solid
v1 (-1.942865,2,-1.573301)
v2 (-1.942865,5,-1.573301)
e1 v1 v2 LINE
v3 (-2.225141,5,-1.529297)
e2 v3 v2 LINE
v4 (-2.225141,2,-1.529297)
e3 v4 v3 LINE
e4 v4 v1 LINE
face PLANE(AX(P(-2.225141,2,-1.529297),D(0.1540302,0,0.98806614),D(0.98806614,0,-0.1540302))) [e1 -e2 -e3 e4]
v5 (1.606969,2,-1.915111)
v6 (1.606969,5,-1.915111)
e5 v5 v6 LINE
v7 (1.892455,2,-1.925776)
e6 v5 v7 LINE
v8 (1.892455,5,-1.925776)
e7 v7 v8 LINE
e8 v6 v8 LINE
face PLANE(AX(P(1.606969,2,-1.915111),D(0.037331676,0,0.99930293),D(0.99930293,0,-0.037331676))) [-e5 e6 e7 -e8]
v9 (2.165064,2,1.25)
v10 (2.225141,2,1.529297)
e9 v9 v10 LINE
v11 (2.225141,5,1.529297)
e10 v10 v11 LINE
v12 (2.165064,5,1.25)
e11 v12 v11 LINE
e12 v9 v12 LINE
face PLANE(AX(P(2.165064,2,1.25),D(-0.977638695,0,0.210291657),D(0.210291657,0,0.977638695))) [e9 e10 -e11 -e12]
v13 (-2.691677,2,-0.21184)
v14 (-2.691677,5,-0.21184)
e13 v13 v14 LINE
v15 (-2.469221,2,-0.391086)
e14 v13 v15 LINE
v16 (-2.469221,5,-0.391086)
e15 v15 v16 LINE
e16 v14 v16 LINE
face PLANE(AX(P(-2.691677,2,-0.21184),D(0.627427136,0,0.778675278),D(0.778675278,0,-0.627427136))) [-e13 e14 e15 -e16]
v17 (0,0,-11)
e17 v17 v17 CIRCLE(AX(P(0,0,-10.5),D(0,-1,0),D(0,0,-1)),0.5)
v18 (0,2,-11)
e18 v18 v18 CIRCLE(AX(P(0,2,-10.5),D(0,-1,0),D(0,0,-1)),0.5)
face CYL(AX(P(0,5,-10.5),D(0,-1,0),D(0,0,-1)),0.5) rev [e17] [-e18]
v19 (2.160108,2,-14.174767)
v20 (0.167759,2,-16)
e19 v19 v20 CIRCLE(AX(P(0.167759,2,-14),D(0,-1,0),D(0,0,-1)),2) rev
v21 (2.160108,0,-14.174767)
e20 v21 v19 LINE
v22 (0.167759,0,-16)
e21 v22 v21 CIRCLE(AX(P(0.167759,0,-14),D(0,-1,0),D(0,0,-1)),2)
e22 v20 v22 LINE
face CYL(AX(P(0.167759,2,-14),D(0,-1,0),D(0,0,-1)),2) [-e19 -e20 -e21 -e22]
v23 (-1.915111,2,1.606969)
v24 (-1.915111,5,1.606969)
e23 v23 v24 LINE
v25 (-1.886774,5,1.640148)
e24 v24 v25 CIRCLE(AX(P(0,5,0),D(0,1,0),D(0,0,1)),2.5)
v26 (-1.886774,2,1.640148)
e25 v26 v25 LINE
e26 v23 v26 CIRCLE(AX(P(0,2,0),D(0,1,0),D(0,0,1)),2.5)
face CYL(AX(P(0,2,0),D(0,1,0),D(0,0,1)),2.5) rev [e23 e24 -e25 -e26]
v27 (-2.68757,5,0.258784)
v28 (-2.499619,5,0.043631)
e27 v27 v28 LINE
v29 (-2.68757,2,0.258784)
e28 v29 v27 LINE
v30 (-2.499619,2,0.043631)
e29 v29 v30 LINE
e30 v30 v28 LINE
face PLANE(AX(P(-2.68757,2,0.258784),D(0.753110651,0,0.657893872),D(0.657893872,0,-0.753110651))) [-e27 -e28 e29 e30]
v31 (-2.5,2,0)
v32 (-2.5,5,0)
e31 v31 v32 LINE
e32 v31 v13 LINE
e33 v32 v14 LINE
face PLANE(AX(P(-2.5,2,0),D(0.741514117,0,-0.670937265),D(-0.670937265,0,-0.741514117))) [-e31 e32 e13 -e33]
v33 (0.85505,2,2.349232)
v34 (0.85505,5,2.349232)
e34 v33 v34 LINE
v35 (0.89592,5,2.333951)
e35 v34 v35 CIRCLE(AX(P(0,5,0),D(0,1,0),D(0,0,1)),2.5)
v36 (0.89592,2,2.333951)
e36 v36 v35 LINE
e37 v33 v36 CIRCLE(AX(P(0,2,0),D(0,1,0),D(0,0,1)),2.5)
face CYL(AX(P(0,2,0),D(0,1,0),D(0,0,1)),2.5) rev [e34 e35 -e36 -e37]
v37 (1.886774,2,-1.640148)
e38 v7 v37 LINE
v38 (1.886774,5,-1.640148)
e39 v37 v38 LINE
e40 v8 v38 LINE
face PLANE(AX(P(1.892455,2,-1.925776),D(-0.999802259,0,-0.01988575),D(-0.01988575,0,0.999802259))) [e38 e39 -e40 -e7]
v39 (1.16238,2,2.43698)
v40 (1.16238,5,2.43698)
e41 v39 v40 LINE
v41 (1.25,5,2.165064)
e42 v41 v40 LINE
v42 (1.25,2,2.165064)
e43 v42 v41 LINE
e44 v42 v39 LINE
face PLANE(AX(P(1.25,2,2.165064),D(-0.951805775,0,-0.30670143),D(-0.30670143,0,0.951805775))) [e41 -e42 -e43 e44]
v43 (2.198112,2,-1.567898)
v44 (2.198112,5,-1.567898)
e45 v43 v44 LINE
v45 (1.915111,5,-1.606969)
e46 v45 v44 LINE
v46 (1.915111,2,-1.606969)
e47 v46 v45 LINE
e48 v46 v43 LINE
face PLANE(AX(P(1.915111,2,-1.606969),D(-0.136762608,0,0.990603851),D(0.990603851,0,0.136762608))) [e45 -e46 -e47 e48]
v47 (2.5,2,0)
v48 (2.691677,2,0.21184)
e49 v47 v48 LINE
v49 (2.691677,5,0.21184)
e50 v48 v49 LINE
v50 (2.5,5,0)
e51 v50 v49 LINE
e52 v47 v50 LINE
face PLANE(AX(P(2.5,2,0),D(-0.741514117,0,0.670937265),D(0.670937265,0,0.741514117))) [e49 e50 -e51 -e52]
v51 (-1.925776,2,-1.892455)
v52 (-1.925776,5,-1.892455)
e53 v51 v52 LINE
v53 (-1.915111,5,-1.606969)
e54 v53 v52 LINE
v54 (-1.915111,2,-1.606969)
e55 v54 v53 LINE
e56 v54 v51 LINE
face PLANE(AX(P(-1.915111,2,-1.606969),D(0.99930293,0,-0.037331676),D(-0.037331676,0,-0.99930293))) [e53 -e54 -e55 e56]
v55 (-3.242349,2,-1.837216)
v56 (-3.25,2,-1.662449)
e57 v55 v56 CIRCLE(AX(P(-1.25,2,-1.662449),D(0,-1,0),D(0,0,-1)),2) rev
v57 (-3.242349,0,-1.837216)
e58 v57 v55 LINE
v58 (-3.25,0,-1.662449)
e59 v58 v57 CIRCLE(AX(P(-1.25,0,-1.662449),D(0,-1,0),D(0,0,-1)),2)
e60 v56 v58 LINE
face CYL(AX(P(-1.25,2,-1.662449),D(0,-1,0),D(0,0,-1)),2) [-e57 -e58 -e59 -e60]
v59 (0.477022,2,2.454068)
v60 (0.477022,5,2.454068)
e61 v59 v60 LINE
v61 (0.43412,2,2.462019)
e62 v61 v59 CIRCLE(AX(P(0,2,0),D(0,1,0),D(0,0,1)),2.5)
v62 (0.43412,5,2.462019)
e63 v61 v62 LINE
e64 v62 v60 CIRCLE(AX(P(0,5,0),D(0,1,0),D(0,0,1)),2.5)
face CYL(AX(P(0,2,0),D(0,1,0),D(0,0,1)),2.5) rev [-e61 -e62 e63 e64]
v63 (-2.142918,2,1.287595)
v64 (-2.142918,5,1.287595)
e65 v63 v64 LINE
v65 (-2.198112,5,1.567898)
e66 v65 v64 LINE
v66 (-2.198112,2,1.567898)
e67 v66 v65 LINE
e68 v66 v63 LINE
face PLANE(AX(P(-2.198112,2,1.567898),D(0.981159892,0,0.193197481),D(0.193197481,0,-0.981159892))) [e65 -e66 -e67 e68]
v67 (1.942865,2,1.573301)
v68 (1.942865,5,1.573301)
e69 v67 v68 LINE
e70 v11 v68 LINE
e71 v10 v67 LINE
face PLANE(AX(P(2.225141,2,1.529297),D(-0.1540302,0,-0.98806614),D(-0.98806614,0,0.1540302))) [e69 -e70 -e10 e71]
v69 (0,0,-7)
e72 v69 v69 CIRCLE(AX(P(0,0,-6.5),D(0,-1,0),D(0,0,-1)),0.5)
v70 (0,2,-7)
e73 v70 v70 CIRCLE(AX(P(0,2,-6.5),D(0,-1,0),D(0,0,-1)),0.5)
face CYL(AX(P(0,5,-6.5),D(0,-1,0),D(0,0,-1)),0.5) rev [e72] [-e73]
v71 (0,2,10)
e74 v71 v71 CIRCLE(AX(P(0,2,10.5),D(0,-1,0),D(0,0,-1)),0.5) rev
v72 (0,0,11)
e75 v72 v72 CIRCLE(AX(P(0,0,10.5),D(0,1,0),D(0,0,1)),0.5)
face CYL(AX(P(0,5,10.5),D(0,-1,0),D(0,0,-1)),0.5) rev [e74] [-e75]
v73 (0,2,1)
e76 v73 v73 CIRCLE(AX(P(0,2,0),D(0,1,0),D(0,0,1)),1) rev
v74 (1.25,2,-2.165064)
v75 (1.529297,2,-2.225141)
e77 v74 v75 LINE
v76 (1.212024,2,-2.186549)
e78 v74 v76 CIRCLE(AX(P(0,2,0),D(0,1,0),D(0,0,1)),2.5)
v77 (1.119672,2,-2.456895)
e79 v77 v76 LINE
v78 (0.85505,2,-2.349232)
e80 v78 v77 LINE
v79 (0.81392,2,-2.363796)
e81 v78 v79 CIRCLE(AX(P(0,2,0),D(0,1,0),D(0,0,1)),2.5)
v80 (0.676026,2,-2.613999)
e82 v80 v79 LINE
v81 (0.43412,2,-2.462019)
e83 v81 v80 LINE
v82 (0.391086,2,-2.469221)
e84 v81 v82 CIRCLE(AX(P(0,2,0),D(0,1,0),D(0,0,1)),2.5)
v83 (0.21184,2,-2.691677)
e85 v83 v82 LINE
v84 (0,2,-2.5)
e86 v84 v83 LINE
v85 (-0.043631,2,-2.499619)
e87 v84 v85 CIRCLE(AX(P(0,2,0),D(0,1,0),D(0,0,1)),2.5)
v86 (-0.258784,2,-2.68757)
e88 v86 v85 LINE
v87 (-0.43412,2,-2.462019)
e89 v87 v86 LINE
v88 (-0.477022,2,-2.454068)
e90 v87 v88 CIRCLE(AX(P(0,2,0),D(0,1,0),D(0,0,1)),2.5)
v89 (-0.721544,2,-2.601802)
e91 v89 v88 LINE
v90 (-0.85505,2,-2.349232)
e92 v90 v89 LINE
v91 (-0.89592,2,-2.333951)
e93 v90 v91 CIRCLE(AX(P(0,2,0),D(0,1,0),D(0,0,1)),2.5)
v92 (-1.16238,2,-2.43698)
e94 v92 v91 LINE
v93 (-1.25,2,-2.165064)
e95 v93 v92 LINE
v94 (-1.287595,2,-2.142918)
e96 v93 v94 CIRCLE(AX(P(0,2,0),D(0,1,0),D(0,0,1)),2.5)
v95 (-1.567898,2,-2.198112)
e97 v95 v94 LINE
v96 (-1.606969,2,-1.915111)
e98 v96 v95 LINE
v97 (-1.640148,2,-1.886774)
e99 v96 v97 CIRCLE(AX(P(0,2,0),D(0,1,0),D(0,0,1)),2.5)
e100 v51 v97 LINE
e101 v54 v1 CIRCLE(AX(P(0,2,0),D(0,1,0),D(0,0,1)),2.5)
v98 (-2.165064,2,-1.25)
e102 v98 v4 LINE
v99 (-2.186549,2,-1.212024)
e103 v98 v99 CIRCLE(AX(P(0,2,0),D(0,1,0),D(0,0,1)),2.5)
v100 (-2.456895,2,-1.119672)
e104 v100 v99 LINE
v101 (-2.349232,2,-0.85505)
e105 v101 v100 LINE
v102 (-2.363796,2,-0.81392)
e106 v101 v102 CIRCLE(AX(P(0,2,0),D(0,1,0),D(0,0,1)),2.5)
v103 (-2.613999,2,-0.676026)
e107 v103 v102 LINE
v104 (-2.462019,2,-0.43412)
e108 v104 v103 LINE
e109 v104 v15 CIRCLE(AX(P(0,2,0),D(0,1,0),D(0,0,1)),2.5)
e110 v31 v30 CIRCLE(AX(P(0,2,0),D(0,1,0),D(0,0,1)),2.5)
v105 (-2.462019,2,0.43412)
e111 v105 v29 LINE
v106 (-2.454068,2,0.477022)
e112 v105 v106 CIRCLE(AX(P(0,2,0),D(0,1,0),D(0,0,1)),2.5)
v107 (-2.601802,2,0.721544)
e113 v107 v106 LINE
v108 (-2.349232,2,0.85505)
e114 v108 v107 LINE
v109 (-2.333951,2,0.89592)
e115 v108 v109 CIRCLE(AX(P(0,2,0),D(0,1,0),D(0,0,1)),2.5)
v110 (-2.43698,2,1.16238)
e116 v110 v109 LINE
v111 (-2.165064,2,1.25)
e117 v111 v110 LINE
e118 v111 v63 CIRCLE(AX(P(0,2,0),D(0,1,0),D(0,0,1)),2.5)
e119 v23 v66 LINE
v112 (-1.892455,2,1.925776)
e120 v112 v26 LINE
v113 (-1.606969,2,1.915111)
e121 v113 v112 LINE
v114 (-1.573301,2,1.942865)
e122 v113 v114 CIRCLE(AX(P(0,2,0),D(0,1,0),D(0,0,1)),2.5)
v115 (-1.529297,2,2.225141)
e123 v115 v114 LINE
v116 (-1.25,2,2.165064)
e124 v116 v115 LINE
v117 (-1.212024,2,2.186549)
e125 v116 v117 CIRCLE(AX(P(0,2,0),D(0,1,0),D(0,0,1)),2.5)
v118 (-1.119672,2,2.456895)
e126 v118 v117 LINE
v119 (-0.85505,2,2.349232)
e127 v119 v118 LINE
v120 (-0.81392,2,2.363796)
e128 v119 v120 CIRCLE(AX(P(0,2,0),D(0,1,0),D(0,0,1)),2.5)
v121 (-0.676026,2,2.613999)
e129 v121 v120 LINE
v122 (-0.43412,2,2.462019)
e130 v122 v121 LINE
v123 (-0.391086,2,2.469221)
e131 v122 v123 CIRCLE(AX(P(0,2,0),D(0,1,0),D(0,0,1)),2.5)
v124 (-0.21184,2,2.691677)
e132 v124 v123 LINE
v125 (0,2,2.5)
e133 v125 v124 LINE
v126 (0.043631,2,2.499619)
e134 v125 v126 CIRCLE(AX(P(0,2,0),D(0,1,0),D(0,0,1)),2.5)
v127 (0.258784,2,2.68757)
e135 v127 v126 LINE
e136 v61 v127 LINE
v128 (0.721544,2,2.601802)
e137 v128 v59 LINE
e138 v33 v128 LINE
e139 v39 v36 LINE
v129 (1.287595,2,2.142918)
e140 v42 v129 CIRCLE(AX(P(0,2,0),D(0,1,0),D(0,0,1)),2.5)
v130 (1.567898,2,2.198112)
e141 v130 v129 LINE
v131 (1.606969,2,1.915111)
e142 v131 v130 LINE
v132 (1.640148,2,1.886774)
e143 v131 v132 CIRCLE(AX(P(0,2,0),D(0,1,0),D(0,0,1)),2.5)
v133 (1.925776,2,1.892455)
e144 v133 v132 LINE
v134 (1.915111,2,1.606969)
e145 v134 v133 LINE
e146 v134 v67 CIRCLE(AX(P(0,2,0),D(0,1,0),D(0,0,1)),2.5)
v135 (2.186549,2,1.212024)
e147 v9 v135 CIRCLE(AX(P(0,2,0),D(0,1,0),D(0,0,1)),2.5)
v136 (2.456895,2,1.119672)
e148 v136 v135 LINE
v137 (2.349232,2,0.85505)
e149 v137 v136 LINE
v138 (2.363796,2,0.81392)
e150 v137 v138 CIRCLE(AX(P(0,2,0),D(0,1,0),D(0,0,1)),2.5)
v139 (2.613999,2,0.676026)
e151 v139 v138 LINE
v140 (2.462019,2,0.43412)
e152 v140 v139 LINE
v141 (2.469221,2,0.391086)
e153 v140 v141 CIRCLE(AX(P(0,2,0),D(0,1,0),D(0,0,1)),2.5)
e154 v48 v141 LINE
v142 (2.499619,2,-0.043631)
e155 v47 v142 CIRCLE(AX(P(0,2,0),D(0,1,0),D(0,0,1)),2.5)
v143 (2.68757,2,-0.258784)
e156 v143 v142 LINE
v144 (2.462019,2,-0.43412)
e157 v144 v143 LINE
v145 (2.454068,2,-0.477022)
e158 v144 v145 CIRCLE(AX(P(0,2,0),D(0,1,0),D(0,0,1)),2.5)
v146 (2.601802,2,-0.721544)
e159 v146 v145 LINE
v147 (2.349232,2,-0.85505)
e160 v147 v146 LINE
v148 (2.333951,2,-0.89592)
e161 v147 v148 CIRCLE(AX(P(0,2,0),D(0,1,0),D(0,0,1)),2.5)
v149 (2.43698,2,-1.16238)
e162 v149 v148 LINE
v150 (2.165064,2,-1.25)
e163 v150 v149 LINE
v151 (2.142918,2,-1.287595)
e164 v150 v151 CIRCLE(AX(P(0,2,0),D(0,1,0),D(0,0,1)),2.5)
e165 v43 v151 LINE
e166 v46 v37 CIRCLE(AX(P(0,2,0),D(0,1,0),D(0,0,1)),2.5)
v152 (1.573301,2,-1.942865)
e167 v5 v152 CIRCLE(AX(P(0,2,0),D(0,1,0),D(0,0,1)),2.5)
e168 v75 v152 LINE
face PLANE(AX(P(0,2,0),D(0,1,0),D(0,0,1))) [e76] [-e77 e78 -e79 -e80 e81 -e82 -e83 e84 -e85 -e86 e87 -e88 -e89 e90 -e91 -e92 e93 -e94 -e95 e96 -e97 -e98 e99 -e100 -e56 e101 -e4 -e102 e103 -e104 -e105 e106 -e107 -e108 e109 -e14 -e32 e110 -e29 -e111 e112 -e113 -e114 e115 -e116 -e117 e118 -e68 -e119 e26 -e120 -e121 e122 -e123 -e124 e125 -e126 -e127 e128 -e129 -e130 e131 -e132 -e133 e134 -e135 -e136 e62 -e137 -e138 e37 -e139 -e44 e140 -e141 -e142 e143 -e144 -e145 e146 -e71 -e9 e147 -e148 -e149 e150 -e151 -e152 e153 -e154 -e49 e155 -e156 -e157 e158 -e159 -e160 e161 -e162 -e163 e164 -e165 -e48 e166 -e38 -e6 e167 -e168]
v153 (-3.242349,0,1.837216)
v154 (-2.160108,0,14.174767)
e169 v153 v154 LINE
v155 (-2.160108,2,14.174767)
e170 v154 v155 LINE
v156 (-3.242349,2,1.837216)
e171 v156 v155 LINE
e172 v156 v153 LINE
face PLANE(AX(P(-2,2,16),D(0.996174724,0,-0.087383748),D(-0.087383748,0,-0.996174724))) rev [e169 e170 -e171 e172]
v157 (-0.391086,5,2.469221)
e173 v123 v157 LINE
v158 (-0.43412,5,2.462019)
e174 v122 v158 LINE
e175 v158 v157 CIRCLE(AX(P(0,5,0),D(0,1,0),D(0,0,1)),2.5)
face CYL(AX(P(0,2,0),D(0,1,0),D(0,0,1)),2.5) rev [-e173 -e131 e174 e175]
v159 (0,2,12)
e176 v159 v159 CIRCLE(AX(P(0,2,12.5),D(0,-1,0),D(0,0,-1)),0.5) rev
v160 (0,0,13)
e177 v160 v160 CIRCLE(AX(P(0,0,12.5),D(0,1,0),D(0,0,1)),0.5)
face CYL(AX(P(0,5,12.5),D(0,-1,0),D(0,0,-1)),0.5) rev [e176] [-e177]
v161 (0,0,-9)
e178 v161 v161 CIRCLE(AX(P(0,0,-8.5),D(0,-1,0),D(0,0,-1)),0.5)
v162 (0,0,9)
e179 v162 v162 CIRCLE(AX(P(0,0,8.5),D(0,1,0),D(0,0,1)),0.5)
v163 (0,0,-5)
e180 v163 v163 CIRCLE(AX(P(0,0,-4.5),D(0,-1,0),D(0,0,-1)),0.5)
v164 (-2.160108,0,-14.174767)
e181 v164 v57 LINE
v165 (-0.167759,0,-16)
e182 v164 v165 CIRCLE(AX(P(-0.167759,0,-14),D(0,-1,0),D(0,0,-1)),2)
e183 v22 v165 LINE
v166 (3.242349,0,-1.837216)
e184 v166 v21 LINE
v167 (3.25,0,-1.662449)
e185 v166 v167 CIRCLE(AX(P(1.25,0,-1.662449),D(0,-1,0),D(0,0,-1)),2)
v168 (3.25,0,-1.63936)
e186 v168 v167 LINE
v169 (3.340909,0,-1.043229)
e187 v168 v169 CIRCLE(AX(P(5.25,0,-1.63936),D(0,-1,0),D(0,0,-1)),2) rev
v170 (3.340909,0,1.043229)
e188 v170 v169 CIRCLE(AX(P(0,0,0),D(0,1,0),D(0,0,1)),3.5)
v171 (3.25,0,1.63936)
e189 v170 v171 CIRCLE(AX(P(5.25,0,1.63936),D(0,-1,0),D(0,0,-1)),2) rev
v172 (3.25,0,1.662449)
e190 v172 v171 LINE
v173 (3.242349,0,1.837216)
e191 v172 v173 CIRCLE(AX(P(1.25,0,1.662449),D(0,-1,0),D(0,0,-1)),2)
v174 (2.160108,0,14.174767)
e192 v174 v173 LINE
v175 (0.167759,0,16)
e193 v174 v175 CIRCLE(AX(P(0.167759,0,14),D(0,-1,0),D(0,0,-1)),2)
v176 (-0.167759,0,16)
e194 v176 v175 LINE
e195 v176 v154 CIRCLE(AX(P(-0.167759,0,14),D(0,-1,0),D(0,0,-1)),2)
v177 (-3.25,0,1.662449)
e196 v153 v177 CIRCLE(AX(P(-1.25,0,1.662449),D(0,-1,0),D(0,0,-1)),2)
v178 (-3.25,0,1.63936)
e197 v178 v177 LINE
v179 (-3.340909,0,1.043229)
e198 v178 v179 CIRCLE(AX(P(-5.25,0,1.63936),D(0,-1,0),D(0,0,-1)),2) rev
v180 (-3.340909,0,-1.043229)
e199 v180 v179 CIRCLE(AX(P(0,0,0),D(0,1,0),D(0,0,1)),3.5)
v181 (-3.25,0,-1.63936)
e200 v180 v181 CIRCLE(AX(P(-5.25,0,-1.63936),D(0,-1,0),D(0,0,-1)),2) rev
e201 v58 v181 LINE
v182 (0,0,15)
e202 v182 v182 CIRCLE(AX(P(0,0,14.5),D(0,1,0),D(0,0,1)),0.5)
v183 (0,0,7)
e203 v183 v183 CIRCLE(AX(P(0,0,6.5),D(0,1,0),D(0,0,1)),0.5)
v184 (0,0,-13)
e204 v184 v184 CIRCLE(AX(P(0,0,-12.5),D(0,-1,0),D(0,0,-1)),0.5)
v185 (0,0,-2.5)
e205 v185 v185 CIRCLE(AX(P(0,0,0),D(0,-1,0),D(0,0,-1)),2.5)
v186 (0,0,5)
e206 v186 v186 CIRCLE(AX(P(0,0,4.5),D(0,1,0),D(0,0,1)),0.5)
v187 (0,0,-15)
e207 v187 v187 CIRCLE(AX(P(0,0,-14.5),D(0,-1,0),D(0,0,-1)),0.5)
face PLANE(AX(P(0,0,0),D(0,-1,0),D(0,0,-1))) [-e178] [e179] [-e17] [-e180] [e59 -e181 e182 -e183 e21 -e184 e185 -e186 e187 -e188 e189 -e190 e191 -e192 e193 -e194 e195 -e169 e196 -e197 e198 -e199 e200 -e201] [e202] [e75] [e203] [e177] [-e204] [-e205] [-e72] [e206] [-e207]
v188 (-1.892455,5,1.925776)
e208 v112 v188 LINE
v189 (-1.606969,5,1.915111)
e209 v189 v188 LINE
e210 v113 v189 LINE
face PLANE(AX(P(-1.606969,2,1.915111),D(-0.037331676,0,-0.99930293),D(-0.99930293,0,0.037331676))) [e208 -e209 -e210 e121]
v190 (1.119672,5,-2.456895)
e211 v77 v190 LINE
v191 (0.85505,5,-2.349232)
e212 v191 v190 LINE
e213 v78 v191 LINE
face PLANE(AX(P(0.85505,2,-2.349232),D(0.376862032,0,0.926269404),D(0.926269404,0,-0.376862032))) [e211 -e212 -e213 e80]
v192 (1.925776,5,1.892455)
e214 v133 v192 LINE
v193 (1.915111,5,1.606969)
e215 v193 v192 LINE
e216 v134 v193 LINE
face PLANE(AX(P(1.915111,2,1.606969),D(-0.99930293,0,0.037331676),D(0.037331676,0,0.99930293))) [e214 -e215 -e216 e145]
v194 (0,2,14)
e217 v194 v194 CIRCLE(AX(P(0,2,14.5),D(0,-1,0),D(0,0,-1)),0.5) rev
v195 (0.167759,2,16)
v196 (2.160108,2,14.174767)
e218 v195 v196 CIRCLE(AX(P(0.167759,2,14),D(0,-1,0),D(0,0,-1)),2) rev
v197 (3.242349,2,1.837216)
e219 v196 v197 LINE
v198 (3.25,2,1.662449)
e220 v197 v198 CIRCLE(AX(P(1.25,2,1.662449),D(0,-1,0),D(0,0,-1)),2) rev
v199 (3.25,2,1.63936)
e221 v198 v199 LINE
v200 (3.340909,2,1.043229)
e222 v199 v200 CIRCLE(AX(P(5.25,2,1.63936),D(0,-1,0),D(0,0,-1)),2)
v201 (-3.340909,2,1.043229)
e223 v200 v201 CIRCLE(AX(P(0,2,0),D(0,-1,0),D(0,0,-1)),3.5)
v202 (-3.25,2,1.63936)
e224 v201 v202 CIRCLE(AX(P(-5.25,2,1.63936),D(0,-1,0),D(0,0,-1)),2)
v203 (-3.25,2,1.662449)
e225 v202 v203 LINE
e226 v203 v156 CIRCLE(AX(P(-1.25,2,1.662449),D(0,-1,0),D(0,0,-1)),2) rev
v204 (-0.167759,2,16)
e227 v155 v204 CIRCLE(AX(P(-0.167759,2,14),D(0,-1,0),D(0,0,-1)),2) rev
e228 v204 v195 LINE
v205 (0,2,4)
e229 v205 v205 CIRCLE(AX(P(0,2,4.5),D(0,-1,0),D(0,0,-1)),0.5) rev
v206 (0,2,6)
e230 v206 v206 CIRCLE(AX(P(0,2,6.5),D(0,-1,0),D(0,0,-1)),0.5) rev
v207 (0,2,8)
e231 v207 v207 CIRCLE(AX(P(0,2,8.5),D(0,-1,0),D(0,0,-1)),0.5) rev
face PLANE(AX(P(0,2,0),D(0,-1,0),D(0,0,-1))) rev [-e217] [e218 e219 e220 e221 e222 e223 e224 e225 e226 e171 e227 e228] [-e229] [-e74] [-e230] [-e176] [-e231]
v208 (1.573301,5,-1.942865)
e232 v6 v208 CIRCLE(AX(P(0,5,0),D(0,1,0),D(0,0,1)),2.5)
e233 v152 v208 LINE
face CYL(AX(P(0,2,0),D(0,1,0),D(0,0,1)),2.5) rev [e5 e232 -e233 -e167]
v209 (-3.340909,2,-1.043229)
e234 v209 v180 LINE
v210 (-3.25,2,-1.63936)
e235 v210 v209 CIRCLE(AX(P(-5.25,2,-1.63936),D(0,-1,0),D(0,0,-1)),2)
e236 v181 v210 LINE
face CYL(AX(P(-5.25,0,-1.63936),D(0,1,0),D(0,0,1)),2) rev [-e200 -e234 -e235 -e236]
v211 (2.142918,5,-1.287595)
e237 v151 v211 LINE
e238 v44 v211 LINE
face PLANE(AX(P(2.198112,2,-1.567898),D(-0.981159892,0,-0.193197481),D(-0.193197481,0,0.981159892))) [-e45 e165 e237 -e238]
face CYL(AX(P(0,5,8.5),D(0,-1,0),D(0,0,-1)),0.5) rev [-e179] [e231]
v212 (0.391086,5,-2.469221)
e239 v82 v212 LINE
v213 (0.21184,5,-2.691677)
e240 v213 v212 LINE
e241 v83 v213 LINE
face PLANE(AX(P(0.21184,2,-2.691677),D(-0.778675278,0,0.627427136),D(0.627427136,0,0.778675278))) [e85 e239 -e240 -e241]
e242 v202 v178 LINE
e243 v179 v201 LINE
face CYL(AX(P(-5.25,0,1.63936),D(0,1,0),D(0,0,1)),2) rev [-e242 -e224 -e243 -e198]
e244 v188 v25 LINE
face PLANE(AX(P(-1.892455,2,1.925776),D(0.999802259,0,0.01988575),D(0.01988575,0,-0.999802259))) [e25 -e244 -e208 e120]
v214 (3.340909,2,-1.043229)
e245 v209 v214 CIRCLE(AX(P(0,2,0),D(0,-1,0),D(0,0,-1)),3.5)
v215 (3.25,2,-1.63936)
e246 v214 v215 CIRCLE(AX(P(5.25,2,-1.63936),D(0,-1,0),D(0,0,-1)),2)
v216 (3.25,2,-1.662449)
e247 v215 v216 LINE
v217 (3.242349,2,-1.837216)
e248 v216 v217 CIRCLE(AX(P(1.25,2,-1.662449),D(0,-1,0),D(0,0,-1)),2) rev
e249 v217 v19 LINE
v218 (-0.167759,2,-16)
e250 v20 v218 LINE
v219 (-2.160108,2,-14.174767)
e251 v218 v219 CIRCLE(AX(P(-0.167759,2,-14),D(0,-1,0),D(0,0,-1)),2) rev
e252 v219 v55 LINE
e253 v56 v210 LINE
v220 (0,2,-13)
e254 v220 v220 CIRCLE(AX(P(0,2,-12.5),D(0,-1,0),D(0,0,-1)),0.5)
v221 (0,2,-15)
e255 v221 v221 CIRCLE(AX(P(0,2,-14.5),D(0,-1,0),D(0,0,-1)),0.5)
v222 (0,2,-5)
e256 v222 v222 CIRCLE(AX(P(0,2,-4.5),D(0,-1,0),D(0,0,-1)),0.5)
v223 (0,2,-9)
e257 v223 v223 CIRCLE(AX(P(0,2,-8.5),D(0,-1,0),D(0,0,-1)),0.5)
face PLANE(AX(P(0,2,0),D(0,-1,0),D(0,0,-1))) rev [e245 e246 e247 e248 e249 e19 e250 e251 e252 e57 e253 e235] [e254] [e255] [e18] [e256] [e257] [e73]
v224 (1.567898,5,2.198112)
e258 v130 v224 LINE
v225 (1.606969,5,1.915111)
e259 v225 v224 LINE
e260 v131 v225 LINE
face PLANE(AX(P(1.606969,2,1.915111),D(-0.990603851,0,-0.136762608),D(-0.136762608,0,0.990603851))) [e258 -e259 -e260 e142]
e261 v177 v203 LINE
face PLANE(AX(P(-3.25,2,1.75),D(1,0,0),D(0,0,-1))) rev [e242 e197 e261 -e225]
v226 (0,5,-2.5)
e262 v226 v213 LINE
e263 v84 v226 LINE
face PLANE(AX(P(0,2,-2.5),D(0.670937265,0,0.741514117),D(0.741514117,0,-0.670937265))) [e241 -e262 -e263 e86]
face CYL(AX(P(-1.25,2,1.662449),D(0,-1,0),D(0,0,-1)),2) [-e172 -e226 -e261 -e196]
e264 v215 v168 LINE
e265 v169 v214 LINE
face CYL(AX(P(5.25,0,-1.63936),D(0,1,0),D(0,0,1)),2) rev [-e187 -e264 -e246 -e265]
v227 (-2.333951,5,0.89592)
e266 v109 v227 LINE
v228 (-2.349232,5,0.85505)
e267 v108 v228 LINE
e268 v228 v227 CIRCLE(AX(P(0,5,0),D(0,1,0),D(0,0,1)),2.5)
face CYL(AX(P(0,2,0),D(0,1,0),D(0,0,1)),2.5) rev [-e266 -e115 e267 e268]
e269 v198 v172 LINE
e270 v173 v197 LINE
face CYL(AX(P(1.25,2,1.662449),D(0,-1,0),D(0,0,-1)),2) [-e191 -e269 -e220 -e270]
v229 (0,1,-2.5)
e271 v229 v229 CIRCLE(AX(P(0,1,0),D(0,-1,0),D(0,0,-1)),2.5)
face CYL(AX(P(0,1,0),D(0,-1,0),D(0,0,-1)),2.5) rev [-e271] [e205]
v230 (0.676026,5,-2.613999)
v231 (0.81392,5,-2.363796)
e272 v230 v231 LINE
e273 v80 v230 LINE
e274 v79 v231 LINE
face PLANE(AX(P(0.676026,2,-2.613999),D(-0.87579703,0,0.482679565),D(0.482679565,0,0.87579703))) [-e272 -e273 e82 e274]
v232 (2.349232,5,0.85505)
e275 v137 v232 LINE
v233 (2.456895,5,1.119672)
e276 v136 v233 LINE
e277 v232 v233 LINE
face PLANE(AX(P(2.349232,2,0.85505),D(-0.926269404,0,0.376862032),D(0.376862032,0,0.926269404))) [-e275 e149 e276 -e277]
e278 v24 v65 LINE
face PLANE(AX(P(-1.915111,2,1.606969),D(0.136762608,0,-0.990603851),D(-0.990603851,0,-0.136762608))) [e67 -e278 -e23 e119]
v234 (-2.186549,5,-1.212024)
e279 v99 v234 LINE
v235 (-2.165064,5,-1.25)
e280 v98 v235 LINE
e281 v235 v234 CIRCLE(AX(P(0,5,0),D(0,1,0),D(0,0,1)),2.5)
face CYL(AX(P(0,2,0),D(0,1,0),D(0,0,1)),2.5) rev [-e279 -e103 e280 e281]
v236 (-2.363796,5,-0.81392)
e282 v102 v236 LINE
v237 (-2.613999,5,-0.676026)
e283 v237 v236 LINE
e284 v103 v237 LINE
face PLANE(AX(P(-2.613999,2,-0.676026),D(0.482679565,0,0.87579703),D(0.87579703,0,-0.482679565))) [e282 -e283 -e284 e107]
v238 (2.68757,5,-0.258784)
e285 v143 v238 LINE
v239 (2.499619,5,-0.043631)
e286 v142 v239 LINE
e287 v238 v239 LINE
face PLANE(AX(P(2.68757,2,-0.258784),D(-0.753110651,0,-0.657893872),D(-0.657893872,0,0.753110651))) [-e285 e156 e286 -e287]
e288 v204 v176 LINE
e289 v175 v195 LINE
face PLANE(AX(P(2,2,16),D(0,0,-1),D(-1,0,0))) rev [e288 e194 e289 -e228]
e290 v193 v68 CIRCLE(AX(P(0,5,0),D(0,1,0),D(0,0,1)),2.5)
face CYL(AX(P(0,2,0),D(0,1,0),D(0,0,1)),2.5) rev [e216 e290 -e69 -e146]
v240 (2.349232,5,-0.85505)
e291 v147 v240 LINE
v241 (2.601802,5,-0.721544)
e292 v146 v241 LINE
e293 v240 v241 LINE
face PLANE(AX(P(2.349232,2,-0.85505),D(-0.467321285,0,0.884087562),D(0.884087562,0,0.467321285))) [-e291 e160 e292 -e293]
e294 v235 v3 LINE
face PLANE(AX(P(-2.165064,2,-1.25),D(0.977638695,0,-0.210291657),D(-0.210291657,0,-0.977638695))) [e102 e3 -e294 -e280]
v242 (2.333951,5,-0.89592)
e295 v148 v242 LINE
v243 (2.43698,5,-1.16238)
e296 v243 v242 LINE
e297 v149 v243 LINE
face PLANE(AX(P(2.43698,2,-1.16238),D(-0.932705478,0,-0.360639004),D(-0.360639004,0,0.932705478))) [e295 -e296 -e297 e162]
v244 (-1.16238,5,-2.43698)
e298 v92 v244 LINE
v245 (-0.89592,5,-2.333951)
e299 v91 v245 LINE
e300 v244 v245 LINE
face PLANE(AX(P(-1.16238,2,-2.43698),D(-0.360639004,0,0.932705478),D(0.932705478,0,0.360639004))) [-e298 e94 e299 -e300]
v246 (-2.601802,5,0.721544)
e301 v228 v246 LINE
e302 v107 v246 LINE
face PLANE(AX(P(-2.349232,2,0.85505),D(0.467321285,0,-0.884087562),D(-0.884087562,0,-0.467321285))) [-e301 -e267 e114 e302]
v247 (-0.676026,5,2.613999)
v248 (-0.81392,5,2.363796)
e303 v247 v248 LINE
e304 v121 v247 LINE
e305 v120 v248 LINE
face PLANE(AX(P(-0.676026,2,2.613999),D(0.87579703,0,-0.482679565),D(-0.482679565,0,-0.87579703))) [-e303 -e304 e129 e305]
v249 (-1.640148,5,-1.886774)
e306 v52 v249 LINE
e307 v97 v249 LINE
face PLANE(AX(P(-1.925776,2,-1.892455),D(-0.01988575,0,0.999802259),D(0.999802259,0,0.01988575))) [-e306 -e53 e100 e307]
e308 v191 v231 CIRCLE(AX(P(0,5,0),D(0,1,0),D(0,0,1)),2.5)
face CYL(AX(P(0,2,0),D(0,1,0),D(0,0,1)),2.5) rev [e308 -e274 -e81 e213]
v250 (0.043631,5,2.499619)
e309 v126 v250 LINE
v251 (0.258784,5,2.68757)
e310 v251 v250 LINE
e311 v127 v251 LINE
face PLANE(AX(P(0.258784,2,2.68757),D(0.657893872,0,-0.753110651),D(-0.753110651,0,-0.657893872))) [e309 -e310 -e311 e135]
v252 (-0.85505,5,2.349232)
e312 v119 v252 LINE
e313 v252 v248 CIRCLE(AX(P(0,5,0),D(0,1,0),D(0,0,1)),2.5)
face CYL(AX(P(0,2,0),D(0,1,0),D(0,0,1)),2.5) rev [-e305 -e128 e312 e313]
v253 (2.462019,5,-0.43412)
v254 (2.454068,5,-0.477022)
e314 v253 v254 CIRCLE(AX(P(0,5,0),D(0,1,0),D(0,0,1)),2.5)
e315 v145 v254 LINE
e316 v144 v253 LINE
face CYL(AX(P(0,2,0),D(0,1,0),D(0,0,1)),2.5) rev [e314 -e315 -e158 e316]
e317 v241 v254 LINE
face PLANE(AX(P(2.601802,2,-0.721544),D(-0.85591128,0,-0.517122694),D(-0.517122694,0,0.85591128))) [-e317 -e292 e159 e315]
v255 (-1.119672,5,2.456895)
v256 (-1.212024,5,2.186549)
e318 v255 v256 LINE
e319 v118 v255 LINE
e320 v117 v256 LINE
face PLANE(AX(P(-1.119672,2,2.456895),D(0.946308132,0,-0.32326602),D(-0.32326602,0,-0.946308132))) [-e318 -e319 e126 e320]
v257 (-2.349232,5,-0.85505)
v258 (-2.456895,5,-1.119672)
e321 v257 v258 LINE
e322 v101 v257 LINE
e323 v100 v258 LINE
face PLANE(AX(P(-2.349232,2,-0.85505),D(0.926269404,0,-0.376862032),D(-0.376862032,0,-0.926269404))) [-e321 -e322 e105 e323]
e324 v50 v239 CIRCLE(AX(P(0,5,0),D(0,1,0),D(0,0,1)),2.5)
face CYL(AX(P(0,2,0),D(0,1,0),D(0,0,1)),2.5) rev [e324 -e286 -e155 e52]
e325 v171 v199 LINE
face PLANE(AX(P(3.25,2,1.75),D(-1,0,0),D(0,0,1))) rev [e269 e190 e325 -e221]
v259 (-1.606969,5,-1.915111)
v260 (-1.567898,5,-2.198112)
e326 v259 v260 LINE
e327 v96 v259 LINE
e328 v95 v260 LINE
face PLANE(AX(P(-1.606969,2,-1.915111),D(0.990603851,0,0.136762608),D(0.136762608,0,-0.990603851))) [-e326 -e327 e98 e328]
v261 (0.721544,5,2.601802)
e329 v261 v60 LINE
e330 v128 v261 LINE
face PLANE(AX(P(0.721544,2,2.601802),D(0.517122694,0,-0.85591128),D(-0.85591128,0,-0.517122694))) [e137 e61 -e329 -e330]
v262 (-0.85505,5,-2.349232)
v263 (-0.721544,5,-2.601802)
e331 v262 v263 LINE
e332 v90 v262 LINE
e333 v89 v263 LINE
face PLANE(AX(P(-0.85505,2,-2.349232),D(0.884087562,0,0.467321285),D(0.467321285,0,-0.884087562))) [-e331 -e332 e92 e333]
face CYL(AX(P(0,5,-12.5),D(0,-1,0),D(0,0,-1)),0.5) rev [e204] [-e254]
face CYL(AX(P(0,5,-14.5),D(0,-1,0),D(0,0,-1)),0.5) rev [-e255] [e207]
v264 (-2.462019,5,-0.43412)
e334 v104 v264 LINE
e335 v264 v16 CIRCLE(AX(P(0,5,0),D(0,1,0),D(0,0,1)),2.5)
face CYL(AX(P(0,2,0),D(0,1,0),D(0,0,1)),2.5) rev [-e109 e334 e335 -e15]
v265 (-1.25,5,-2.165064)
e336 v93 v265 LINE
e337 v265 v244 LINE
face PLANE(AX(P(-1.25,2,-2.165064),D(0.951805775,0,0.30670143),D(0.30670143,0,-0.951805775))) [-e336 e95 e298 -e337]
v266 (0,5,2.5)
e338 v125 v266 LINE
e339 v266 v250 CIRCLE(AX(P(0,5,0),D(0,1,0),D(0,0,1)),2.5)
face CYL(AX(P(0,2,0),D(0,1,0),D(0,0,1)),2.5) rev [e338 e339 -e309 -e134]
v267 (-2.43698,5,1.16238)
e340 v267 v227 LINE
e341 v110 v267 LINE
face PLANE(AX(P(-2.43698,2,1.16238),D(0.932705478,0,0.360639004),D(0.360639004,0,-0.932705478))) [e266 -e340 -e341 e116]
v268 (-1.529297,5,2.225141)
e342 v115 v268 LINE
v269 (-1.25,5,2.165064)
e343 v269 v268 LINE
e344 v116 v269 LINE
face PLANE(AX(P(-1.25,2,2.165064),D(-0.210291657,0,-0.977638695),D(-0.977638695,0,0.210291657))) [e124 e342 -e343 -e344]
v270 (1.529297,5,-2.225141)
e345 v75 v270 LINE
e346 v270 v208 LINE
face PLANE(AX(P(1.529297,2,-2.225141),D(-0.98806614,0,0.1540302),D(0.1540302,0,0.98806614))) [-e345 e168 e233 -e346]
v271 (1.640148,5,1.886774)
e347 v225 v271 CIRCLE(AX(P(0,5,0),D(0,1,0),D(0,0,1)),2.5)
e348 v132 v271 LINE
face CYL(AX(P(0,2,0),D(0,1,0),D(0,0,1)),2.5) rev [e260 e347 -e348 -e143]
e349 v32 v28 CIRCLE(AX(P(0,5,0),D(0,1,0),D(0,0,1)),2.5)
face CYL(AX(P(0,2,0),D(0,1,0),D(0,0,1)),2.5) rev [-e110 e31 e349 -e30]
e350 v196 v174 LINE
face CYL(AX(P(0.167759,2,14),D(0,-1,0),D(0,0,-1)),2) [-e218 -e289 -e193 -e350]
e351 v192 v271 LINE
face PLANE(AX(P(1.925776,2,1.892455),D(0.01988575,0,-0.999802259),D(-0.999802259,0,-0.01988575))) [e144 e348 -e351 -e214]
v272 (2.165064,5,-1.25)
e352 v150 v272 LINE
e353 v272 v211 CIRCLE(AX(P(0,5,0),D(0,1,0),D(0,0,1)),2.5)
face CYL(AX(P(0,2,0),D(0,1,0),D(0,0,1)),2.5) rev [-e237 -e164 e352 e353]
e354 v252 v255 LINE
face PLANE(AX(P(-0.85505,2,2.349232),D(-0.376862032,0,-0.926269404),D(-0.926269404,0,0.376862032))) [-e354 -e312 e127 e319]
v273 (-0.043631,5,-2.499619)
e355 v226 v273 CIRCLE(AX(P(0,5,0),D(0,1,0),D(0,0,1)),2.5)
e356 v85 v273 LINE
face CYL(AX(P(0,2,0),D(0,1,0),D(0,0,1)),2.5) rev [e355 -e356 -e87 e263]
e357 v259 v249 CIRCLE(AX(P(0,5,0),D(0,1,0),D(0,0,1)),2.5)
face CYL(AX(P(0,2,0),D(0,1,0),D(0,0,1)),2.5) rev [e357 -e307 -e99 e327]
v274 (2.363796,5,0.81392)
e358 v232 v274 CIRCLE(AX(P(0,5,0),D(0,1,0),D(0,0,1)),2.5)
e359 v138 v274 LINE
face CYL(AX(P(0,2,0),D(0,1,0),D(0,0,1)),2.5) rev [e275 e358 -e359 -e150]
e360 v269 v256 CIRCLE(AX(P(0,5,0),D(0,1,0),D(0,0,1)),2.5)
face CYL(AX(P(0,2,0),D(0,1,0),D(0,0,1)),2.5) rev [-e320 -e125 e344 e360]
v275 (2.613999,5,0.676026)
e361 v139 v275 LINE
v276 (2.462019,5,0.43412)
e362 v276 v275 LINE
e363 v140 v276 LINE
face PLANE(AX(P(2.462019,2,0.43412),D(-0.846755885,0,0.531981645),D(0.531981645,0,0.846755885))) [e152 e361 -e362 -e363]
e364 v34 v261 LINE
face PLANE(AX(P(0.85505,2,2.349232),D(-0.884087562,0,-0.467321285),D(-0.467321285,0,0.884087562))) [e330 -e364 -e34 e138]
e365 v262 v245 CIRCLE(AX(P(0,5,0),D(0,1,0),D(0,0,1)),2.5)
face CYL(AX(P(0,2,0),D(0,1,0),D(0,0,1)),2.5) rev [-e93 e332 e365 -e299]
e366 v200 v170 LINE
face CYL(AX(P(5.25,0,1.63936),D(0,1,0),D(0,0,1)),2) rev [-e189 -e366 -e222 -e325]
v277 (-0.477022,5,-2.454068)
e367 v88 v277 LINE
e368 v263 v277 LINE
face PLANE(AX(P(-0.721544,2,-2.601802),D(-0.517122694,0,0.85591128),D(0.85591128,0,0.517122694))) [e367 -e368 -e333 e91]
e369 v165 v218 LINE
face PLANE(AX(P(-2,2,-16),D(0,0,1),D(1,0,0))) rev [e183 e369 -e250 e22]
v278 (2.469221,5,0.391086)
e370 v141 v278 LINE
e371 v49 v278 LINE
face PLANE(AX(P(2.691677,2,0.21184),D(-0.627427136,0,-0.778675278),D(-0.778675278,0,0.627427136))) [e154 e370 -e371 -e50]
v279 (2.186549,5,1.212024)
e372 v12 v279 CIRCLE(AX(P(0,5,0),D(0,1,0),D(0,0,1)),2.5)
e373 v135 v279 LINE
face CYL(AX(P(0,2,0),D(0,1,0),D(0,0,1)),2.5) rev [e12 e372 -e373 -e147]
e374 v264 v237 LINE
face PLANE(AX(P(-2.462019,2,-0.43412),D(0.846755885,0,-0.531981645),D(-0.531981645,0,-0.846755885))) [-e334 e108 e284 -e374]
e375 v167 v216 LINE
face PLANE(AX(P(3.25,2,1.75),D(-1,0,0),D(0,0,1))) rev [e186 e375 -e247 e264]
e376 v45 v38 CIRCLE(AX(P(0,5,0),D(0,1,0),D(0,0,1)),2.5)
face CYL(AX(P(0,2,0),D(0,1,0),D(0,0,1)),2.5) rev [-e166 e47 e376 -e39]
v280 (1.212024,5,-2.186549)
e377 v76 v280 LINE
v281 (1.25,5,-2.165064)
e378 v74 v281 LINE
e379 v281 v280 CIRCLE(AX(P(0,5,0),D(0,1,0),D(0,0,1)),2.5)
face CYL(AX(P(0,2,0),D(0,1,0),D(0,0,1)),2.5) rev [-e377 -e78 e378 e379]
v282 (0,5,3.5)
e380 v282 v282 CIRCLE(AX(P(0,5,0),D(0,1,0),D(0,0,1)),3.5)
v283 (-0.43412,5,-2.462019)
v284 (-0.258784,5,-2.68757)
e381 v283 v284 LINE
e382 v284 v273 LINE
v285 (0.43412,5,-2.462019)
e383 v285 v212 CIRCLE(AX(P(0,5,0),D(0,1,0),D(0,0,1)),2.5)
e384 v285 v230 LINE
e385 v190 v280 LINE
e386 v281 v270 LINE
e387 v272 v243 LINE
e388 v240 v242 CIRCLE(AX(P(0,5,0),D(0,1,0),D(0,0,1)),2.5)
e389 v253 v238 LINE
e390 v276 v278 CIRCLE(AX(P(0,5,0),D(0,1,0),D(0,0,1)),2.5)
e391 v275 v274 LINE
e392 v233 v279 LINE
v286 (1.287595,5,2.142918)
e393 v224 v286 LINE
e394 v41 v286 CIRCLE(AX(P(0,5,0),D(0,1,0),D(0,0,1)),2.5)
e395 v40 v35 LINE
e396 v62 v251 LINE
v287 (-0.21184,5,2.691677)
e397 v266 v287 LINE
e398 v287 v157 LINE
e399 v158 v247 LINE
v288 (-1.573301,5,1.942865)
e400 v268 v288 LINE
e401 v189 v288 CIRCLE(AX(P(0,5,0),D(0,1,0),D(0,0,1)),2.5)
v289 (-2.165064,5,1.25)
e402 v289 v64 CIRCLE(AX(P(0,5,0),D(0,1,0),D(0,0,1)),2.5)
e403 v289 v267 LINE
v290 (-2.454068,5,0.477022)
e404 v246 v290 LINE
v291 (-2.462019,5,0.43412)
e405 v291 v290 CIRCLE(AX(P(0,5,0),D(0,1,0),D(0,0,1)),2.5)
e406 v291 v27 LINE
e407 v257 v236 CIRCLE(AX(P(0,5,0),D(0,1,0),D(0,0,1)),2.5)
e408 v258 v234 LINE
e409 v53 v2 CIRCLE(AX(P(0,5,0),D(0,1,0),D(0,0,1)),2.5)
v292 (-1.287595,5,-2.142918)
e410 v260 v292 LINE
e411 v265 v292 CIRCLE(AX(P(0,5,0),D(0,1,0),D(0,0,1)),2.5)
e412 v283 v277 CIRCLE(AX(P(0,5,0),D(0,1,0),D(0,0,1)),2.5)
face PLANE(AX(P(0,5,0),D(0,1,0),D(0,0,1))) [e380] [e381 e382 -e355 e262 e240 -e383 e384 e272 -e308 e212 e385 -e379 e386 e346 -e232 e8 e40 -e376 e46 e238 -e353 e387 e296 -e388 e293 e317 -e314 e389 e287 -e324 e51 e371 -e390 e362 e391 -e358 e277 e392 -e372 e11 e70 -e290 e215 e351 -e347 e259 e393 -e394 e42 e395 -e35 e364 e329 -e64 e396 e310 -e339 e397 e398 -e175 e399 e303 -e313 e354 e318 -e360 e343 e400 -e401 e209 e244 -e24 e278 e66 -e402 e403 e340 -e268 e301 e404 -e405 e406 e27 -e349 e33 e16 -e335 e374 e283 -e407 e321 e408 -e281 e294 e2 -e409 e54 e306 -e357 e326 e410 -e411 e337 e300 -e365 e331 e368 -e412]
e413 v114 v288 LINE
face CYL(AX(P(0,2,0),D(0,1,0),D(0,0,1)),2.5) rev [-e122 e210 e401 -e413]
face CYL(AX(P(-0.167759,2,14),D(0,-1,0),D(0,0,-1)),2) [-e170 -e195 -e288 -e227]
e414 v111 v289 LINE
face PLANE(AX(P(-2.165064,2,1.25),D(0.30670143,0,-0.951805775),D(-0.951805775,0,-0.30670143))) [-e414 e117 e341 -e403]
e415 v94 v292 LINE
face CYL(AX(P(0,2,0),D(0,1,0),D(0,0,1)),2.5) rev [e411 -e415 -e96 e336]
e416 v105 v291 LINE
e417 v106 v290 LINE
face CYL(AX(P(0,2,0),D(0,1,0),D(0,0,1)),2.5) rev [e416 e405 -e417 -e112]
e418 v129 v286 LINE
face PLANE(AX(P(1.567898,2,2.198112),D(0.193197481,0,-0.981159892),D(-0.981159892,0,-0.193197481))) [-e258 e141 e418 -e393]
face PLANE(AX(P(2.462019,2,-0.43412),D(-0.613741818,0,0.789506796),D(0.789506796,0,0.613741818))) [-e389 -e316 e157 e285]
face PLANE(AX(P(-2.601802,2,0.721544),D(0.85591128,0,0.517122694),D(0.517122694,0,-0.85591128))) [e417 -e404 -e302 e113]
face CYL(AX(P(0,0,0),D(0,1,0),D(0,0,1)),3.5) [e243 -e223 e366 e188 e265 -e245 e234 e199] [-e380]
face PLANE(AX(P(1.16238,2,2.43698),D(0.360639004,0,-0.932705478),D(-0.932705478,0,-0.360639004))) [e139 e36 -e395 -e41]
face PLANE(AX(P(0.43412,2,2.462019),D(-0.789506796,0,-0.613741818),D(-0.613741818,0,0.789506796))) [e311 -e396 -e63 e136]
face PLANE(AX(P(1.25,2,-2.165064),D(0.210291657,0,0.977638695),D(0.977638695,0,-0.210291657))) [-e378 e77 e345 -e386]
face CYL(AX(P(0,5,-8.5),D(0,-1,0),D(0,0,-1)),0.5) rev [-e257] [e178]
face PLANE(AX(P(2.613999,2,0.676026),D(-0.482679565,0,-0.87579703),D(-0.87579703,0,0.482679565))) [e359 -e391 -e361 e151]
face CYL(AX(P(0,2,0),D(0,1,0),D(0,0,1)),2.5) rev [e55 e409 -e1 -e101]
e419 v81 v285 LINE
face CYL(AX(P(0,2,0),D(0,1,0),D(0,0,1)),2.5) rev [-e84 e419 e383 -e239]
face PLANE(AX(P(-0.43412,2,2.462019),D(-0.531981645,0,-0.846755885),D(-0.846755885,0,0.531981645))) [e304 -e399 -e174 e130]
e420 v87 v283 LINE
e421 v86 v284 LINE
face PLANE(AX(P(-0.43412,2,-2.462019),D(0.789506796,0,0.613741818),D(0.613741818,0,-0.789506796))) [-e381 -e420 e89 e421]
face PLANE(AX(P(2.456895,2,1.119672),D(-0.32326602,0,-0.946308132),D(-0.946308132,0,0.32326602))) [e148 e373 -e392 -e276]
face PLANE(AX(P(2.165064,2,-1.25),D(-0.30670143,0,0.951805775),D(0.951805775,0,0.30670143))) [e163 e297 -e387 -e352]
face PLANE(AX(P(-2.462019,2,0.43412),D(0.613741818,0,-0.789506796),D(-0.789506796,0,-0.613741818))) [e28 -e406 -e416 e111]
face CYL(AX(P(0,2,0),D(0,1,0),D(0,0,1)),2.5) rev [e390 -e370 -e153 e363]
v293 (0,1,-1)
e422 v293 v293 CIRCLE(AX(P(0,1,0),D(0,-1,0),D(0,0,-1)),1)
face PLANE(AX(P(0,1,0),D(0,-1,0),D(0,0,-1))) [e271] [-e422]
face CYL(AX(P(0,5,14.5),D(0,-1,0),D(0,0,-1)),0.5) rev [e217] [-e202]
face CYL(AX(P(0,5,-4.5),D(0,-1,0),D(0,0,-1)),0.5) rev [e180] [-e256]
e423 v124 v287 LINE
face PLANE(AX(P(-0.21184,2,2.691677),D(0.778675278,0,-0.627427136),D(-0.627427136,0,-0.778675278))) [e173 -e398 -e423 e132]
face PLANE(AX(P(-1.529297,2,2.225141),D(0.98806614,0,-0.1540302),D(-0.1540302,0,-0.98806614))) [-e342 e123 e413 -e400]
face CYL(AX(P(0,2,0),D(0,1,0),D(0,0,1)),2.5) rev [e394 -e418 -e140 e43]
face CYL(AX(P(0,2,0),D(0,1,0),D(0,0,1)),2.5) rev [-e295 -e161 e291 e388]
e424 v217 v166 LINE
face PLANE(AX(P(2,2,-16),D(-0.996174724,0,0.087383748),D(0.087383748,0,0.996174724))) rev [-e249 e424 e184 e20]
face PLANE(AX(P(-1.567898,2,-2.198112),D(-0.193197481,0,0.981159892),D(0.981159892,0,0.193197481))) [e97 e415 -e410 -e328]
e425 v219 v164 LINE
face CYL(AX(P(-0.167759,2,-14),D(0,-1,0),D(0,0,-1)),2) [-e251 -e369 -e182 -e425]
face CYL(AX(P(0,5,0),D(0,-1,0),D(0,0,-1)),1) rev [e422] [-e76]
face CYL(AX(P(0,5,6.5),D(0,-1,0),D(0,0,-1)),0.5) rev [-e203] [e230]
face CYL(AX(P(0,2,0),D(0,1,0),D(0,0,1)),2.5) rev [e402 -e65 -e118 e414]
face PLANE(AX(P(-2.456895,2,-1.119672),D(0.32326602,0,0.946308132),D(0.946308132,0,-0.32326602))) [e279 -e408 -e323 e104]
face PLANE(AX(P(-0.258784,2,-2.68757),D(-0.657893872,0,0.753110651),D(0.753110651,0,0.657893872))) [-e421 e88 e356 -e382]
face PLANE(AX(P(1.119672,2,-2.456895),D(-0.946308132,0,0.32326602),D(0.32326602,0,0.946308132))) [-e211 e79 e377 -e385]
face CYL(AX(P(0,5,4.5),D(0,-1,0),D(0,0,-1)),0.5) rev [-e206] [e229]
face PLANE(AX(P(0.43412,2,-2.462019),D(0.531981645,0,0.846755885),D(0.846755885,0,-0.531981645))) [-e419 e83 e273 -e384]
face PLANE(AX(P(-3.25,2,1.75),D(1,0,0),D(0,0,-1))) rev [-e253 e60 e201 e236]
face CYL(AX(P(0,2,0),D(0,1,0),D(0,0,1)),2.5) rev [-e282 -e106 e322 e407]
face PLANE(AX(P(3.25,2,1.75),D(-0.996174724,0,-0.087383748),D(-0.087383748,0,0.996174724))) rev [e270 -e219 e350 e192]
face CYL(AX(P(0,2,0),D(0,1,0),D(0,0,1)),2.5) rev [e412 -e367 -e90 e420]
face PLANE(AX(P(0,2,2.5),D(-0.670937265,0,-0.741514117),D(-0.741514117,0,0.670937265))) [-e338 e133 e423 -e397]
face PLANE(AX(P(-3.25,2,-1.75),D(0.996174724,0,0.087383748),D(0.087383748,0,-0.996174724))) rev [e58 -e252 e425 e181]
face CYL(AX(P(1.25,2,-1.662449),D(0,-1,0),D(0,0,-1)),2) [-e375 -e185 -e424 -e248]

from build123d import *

# Parameters (mm, degrees)
BOSS_EXTRUDE1_DEPTH      = 2
FILLET1_R                = 2
BOSS_EXTRUDE2_DEPTH      = 3
BOSS_EXTRUDE2_DEPTH_BACK = 2
SKETCH2_R                = 3.5
SKETCH3_R                = 2.5
CUT_EXTRUDE1_DEPTH       = 1
SKETCH4_R                = 1
CUT_EXTRUDE2_DEPTH       = 17.8597153
CUT_EXTRUDE3_START       = -3
SKETCH5_R                = 2.5
CUT_EXTRUDE3_DEPTH       = 3
CUT_EXTRUDE4_DEPTH       = 3
CIRPATTERN1_COUNT        = 36
SKETCH9_R                = 0.5
CUT_EXTRUDE5_DEPTH       = 18.12454379
LPATTERN1_COUNT          = 6
LPATTERN1_PITCH          = 2
MIRROR1_COPY_1_SKETCH_R  = 0.5
MIRROR1_COPY_1_DEPTH     = 18.12454379
MIRROR1_COPY_2_SKETCH_R  = 0.5
MIRROR1_COPY_2_DEPTH     = 18.12454379
MIRROR1_COPY_3_SKETCH_R  = 0.5
MIRROR1_COPY_3_DEPTH     = 18.12454379
MIRROR1_COPY_4_SKETCH_R  = 0.5
MIRROR1_COPY_4_DEPTH     = 18.12454379
MIRROR1_COPY_5_SKETCH_R  = 0.5
MIRROR1_COPY_5_DEPTH     = 18.12454379
FILLET3_R                = 2


with BuildPart() as part:
    # Sketch1 → Boss-Extrude1 (new body)
    with BuildSketch(Plane(origin=(0, 0, 0), x_dir=(1, 0, 0), z_dir=(0, 1, 0))):
        Polygon((-3.25, -1.75), (-3.25, 1.75), (-2, 16), (2, 16), (3.25, 1.75), (3.25, -1.75), (2, -16), (-2, -16), align=None)
    extrude(amount=BOSS_EXTRUDE1_DEPTH)

    # Fillet1
    fillet1_edges = [part.edges().sort_by_distance(p)[0] for p in [
        (-2, 1, -16),
        (2, 1, -16),
        (2, 1, 16),
        (-2, 1, 16),
    ]]
    fillet(fillet1_edges, radius=FILLET1_R)

    # Sketch2 → Boss-Extrude2 (add, two sides: drawn at the far end of the back side and taken through both)
    with BuildSketch(Plane(origin=(0, 2, 0), x_dir=(1, 0, 0), z_dir=(0, 1, 0)).offset(-BOSS_EXTRUDE2_DEPTH_BACK)):
        with Locations(Location((0, 0, 0), (0, 0, 270))):
            Circle(SKETCH2_R)
    extrude(amount=BOSS_EXTRUDE2_DEPTH + BOSS_EXTRUDE2_DEPTH_BACK)

    # Sketch3 → Cut-Extrude1 (cut)
    with BuildSketch(Plane(origin=(0, 0, 0), x_dir=(-1, 0, 0), z_dir=(0, -1, 0))):
        with Locations(Location((0, 0, 0), (0, 0, 90))):
            Circle(SKETCH3_R)
    extrude(amount=-CUT_EXTRUDE1_DEPTH, mode=Mode.SUBTRACT)

    # Sketch4 → Cut-Extrude2 (cut, through all)
    with BuildSketch(Plane(origin=(0, 1, 0), x_dir=(-1, 0, 0), z_dir=(0, -1, 0))):
        with Locations(Location((0, 0, 0), (0, 0, 90))):
            Circle(SKETCH4_R)
    extrude(amount=-CUT_EXTRUDE2_DEPTH, mode=Mode.SUBTRACT)

    # Sketch5 → Cut-Extrude3 (cut)
    with BuildSketch(Plane(origin=(0, 5, 0), x_dir=(1, 0, 0), z_dir=(0, 1, 0)).offset(CUT_EXTRUDE3_START)):
        with Locations(Location((0, 0, 0), (0, 0, 90))):
            Circle(SKETCH5_R)
    extrude(amount=CUT_EXTRUDE3_DEPTH, mode=Mode.SUBTRACT)

    # Sketch6 → Cut-Extrude4 (cut)
    with BuildSketch(Plane(origin=(0, 5, 0), x_dir=(1, 0, 0), z_dir=(0, 1, 0))):
        Polygon((-2.5, 0), (-2.691676801, 0.211839558), (-2.469220851, 0.391086163), align=None)
    cut_extrude4 = extrude(amount=-CUT_EXTRUDE4_DEPTH, mode=Mode.SUBTRACT)

    # CirPattern1: Cut-Extrude4 ×36 about axis
    cirpattern1_axis = Axis((0, 0, 0), (0, 1, 0))
    for i in range(1, CIRPATTERN1_COUNT):
        add(cut_extrude4.rotate(cirpattern1_axis, i * 360 / CIRPATTERN1_COUNT), mode=Mode.SUBTRACT)

    # Sketch9 → Cut-Extrude5 (cut, through all)
    with BuildSketch(Plane(origin=(0, 0, 0), x_dir=(-1, 0, 0), z_dir=(0, -1, 0))):
        with Locations(Location((0, 14.5, 0), (0, 0, 90))):
            Circle(SKETCH9_R)
    cut_extrude5 = extrude(amount=-CUT_EXTRUDE5_DEPTH, mode=Mode.SUBTRACT)

    # LPattern1: Cut-Extrude5 ×6
    with Locations(*[(0, 0, i * LPATTERN1_PITCH) for i in range(1, LPATTERN1_COUNT)]):
        add(cut_extrude5, mode=Mode.SUBTRACT)

    # Mirror1: Cut-Extrude5 across plane
    add(cut_extrude5.mirror(Plane.XY), mode=Mode.SUBTRACT)

    # Mirror1 copy 1 sketch → Mirror1 copy 1 (cut, through all)
    with BuildSketch(Plane(origin=(0, 0, -2), x_dir=(-1, 0, 0), z_dir=(0, -1, 0))):
        with Locations((0, -14.5)):
            Circle(MIRROR1_COPY_1_SKETCH_R)
    extrude(amount=-MIRROR1_COPY_1_DEPTH, mode=Mode.SUBTRACT)

    # Mirror1 copy 2 sketch → Mirror1 copy 2 (cut, through all)
    with BuildSketch(Plane(origin=(0, 0, -4), x_dir=(-1, 0, 0), z_dir=(0, -1, 0))):
        with Locations((0, -14.5)):
            Circle(MIRROR1_COPY_2_SKETCH_R)
    extrude(amount=-MIRROR1_COPY_2_DEPTH, mode=Mode.SUBTRACT)

    # Mirror1 copy 3 sketch → Mirror1 copy 3 (cut, through all)
    with BuildSketch(Plane(origin=(0, 0, -6), x_dir=(-1, 0, 0), z_dir=(0, -1, 0))):
        with Locations((0, -14.5)):
            Circle(MIRROR1_COPY_3_SKETCH_R)
    extrude(amount=-MIRROR1_COPY_3_DEPTH, mode=Mode.SUBTRACT)

    # Mirror1 copy 4 sketch → Mirror1 copy 4 (cut, through all)
    with BuildSketch(Plane(origin=(0, 0, -8), x_dir=(-1, 0, 0), z_dir=(0, -1, 0))):
        with Locations((0, -14.5)):
            Circle(MIRROR1_COPY_4_SKETCH_R)
    extrude(amount=-MIRROR1_COPY_4_DEPTH, mode=Mode.SUBTRACT)

    # Mirror1 copy 5 sketch → Mirror1 copy 5 (cut, through all)
    with BuildSketch(Plane(origin=(0, 0, -10), x_dir=(-1, 0, 0), z_dir=(0, -1, 0))):
        with Locations((0, -14.5)):
            Circle(MIRROR1_COPY_5_SKETCH_R)
    extrude(amount=-MIRROR1_COPY_5_DEPTH, mode=Mode.SUBTRACT)

    # Fillet3
    # the kernel refuses this fillet: 2 mm, written as the material it adds along each edge
    with BuildSketch(Plane(origin=(-3.25, 0, 1.299038106), x_dir=(-0.33486149994796977, 0, -0.9422673590083633), z_dir=(0, 1, 0))) as fillet3_piece_1:
        with BuildLine():
            CenterArc((0.349049135, 1.998495294), FILLET3_R, 250.435883949, 17.341442803)
            Line((-0.320673865, 0.113960576), (0, 0))
            ThreePointArc((0, 0), (0.13574133, 0.002633235), (0.271482661, 0))
        make_face()
    extrude(amount=2)
    with BuildSketch(Plane(origin=(3.25, 0, 1.299038106), x_dir=(0.3348614999479675, 0, -0.942267359008364), z_dir=(0, 1, 0))) as fillet3_piece_2:
        with BuildLine():
            CenterArc((0.349049135, -1.998495294), FILLET3_R, 92.222673248, 17.341442803)
            Line((-0.320673865, -0.113960576), (0, 0))
            ThreePointArc((0, 0), (0.13574133, -0.002633235), (0.271482661, 0))
        make_face()
    extrude(amount=2)
    with BuildSketch(Plane(origin=(-3.25, 0, -1.299038106), x_dir=(0, 0, -1), z_dir=(0, 1, 0))) as fillet3_piece_3:
        with BuildLine():
            CenterArc((0.340321525, 2), FILLET3_R, 252.658557197, 17.341442803)
            ThreePointArc((-0.25580925, 0.090909091), (-0.127022856, 0.047935757), (0, 0))
            Line((0, 0), (0.340321525, 0))
        make_face()
    extrude(amount=2)
    with BuildSketch(Plane(origin=(3.25, 0, -1.299038106), x_dir=(0, 0, -1), z_dir=(0, 1, 0))) as fillet3_piece_4:
        with BuildLine():
            CenterArc((0.340321525, -2), FILLET3_R, 90, 17.341442803)
            ThreePointArc((-0.25580925, -0.090909091), (-0.127022856, -0.047935757), (0, 0))
            Line((0, 0), (0.340321525, 0))
        make_face()
    extrude(amount=2)
    # the kernel refuses this fillet: 2 mm, written as the material it takes off along each edge
    with BuildSketch(Plane(origin=(3.25, -0.218878004, -1.75), x_dir=(0, 0, 1), z_dir=(0, 1, 0)), Plane(origin=(3.25, -0.218878004, 1.75), x_dir=(-0.08738374771484606, 0, 0.9961747239492218), z_dir=(0, 1, 0)), Plane(origin=(-3.25, -0.218878004, -1.75), x_dir=(0.08738374771484518, 0, -0.9961747239492218), z_dir=(0, 1, 0))) as fillet3_2_piece_1:
        with BuildLine():
            CenterArc((FILLET3_R * 0.043775600736, -FILLET3_R), FILLET3_R, 90, 5.013113755)
            Line((-FILLET3_R * 0.0436081469789, -FILLET3_R * 0.00382527605078), (0, 0))
            Line((0, 0), (FILLET3_R * 0.043775600736, 0))
        make_face()
    extrude(amount=2.437756007, mode=Mode.SUBTRACT)
    with BuildSketch(Plane(origin=(-3.25, -0.218878004, 1.75), x_dir=(0.08738374771484235, 0, 0.996174723949222), z_dir=(0, 1, 0))) as fillet3_2_piece_2:
        with BuildLine():
            CenterArc((FILLET3_R * 0.043775600736, FILLET3_R), FILLET3_R, 264.986886245, 5.013113755)
            Line((-FILLET3_R * 0.0436081469789, FILLET3_R * 0.00382527605078), (0, 0))
            Line((0, 0), (FILLET3_R * 0.043775600736, 0))
        make_face()
    extrude(amount=2.437756007, mode=Mode.SUBTRACT)


solid = part.part
